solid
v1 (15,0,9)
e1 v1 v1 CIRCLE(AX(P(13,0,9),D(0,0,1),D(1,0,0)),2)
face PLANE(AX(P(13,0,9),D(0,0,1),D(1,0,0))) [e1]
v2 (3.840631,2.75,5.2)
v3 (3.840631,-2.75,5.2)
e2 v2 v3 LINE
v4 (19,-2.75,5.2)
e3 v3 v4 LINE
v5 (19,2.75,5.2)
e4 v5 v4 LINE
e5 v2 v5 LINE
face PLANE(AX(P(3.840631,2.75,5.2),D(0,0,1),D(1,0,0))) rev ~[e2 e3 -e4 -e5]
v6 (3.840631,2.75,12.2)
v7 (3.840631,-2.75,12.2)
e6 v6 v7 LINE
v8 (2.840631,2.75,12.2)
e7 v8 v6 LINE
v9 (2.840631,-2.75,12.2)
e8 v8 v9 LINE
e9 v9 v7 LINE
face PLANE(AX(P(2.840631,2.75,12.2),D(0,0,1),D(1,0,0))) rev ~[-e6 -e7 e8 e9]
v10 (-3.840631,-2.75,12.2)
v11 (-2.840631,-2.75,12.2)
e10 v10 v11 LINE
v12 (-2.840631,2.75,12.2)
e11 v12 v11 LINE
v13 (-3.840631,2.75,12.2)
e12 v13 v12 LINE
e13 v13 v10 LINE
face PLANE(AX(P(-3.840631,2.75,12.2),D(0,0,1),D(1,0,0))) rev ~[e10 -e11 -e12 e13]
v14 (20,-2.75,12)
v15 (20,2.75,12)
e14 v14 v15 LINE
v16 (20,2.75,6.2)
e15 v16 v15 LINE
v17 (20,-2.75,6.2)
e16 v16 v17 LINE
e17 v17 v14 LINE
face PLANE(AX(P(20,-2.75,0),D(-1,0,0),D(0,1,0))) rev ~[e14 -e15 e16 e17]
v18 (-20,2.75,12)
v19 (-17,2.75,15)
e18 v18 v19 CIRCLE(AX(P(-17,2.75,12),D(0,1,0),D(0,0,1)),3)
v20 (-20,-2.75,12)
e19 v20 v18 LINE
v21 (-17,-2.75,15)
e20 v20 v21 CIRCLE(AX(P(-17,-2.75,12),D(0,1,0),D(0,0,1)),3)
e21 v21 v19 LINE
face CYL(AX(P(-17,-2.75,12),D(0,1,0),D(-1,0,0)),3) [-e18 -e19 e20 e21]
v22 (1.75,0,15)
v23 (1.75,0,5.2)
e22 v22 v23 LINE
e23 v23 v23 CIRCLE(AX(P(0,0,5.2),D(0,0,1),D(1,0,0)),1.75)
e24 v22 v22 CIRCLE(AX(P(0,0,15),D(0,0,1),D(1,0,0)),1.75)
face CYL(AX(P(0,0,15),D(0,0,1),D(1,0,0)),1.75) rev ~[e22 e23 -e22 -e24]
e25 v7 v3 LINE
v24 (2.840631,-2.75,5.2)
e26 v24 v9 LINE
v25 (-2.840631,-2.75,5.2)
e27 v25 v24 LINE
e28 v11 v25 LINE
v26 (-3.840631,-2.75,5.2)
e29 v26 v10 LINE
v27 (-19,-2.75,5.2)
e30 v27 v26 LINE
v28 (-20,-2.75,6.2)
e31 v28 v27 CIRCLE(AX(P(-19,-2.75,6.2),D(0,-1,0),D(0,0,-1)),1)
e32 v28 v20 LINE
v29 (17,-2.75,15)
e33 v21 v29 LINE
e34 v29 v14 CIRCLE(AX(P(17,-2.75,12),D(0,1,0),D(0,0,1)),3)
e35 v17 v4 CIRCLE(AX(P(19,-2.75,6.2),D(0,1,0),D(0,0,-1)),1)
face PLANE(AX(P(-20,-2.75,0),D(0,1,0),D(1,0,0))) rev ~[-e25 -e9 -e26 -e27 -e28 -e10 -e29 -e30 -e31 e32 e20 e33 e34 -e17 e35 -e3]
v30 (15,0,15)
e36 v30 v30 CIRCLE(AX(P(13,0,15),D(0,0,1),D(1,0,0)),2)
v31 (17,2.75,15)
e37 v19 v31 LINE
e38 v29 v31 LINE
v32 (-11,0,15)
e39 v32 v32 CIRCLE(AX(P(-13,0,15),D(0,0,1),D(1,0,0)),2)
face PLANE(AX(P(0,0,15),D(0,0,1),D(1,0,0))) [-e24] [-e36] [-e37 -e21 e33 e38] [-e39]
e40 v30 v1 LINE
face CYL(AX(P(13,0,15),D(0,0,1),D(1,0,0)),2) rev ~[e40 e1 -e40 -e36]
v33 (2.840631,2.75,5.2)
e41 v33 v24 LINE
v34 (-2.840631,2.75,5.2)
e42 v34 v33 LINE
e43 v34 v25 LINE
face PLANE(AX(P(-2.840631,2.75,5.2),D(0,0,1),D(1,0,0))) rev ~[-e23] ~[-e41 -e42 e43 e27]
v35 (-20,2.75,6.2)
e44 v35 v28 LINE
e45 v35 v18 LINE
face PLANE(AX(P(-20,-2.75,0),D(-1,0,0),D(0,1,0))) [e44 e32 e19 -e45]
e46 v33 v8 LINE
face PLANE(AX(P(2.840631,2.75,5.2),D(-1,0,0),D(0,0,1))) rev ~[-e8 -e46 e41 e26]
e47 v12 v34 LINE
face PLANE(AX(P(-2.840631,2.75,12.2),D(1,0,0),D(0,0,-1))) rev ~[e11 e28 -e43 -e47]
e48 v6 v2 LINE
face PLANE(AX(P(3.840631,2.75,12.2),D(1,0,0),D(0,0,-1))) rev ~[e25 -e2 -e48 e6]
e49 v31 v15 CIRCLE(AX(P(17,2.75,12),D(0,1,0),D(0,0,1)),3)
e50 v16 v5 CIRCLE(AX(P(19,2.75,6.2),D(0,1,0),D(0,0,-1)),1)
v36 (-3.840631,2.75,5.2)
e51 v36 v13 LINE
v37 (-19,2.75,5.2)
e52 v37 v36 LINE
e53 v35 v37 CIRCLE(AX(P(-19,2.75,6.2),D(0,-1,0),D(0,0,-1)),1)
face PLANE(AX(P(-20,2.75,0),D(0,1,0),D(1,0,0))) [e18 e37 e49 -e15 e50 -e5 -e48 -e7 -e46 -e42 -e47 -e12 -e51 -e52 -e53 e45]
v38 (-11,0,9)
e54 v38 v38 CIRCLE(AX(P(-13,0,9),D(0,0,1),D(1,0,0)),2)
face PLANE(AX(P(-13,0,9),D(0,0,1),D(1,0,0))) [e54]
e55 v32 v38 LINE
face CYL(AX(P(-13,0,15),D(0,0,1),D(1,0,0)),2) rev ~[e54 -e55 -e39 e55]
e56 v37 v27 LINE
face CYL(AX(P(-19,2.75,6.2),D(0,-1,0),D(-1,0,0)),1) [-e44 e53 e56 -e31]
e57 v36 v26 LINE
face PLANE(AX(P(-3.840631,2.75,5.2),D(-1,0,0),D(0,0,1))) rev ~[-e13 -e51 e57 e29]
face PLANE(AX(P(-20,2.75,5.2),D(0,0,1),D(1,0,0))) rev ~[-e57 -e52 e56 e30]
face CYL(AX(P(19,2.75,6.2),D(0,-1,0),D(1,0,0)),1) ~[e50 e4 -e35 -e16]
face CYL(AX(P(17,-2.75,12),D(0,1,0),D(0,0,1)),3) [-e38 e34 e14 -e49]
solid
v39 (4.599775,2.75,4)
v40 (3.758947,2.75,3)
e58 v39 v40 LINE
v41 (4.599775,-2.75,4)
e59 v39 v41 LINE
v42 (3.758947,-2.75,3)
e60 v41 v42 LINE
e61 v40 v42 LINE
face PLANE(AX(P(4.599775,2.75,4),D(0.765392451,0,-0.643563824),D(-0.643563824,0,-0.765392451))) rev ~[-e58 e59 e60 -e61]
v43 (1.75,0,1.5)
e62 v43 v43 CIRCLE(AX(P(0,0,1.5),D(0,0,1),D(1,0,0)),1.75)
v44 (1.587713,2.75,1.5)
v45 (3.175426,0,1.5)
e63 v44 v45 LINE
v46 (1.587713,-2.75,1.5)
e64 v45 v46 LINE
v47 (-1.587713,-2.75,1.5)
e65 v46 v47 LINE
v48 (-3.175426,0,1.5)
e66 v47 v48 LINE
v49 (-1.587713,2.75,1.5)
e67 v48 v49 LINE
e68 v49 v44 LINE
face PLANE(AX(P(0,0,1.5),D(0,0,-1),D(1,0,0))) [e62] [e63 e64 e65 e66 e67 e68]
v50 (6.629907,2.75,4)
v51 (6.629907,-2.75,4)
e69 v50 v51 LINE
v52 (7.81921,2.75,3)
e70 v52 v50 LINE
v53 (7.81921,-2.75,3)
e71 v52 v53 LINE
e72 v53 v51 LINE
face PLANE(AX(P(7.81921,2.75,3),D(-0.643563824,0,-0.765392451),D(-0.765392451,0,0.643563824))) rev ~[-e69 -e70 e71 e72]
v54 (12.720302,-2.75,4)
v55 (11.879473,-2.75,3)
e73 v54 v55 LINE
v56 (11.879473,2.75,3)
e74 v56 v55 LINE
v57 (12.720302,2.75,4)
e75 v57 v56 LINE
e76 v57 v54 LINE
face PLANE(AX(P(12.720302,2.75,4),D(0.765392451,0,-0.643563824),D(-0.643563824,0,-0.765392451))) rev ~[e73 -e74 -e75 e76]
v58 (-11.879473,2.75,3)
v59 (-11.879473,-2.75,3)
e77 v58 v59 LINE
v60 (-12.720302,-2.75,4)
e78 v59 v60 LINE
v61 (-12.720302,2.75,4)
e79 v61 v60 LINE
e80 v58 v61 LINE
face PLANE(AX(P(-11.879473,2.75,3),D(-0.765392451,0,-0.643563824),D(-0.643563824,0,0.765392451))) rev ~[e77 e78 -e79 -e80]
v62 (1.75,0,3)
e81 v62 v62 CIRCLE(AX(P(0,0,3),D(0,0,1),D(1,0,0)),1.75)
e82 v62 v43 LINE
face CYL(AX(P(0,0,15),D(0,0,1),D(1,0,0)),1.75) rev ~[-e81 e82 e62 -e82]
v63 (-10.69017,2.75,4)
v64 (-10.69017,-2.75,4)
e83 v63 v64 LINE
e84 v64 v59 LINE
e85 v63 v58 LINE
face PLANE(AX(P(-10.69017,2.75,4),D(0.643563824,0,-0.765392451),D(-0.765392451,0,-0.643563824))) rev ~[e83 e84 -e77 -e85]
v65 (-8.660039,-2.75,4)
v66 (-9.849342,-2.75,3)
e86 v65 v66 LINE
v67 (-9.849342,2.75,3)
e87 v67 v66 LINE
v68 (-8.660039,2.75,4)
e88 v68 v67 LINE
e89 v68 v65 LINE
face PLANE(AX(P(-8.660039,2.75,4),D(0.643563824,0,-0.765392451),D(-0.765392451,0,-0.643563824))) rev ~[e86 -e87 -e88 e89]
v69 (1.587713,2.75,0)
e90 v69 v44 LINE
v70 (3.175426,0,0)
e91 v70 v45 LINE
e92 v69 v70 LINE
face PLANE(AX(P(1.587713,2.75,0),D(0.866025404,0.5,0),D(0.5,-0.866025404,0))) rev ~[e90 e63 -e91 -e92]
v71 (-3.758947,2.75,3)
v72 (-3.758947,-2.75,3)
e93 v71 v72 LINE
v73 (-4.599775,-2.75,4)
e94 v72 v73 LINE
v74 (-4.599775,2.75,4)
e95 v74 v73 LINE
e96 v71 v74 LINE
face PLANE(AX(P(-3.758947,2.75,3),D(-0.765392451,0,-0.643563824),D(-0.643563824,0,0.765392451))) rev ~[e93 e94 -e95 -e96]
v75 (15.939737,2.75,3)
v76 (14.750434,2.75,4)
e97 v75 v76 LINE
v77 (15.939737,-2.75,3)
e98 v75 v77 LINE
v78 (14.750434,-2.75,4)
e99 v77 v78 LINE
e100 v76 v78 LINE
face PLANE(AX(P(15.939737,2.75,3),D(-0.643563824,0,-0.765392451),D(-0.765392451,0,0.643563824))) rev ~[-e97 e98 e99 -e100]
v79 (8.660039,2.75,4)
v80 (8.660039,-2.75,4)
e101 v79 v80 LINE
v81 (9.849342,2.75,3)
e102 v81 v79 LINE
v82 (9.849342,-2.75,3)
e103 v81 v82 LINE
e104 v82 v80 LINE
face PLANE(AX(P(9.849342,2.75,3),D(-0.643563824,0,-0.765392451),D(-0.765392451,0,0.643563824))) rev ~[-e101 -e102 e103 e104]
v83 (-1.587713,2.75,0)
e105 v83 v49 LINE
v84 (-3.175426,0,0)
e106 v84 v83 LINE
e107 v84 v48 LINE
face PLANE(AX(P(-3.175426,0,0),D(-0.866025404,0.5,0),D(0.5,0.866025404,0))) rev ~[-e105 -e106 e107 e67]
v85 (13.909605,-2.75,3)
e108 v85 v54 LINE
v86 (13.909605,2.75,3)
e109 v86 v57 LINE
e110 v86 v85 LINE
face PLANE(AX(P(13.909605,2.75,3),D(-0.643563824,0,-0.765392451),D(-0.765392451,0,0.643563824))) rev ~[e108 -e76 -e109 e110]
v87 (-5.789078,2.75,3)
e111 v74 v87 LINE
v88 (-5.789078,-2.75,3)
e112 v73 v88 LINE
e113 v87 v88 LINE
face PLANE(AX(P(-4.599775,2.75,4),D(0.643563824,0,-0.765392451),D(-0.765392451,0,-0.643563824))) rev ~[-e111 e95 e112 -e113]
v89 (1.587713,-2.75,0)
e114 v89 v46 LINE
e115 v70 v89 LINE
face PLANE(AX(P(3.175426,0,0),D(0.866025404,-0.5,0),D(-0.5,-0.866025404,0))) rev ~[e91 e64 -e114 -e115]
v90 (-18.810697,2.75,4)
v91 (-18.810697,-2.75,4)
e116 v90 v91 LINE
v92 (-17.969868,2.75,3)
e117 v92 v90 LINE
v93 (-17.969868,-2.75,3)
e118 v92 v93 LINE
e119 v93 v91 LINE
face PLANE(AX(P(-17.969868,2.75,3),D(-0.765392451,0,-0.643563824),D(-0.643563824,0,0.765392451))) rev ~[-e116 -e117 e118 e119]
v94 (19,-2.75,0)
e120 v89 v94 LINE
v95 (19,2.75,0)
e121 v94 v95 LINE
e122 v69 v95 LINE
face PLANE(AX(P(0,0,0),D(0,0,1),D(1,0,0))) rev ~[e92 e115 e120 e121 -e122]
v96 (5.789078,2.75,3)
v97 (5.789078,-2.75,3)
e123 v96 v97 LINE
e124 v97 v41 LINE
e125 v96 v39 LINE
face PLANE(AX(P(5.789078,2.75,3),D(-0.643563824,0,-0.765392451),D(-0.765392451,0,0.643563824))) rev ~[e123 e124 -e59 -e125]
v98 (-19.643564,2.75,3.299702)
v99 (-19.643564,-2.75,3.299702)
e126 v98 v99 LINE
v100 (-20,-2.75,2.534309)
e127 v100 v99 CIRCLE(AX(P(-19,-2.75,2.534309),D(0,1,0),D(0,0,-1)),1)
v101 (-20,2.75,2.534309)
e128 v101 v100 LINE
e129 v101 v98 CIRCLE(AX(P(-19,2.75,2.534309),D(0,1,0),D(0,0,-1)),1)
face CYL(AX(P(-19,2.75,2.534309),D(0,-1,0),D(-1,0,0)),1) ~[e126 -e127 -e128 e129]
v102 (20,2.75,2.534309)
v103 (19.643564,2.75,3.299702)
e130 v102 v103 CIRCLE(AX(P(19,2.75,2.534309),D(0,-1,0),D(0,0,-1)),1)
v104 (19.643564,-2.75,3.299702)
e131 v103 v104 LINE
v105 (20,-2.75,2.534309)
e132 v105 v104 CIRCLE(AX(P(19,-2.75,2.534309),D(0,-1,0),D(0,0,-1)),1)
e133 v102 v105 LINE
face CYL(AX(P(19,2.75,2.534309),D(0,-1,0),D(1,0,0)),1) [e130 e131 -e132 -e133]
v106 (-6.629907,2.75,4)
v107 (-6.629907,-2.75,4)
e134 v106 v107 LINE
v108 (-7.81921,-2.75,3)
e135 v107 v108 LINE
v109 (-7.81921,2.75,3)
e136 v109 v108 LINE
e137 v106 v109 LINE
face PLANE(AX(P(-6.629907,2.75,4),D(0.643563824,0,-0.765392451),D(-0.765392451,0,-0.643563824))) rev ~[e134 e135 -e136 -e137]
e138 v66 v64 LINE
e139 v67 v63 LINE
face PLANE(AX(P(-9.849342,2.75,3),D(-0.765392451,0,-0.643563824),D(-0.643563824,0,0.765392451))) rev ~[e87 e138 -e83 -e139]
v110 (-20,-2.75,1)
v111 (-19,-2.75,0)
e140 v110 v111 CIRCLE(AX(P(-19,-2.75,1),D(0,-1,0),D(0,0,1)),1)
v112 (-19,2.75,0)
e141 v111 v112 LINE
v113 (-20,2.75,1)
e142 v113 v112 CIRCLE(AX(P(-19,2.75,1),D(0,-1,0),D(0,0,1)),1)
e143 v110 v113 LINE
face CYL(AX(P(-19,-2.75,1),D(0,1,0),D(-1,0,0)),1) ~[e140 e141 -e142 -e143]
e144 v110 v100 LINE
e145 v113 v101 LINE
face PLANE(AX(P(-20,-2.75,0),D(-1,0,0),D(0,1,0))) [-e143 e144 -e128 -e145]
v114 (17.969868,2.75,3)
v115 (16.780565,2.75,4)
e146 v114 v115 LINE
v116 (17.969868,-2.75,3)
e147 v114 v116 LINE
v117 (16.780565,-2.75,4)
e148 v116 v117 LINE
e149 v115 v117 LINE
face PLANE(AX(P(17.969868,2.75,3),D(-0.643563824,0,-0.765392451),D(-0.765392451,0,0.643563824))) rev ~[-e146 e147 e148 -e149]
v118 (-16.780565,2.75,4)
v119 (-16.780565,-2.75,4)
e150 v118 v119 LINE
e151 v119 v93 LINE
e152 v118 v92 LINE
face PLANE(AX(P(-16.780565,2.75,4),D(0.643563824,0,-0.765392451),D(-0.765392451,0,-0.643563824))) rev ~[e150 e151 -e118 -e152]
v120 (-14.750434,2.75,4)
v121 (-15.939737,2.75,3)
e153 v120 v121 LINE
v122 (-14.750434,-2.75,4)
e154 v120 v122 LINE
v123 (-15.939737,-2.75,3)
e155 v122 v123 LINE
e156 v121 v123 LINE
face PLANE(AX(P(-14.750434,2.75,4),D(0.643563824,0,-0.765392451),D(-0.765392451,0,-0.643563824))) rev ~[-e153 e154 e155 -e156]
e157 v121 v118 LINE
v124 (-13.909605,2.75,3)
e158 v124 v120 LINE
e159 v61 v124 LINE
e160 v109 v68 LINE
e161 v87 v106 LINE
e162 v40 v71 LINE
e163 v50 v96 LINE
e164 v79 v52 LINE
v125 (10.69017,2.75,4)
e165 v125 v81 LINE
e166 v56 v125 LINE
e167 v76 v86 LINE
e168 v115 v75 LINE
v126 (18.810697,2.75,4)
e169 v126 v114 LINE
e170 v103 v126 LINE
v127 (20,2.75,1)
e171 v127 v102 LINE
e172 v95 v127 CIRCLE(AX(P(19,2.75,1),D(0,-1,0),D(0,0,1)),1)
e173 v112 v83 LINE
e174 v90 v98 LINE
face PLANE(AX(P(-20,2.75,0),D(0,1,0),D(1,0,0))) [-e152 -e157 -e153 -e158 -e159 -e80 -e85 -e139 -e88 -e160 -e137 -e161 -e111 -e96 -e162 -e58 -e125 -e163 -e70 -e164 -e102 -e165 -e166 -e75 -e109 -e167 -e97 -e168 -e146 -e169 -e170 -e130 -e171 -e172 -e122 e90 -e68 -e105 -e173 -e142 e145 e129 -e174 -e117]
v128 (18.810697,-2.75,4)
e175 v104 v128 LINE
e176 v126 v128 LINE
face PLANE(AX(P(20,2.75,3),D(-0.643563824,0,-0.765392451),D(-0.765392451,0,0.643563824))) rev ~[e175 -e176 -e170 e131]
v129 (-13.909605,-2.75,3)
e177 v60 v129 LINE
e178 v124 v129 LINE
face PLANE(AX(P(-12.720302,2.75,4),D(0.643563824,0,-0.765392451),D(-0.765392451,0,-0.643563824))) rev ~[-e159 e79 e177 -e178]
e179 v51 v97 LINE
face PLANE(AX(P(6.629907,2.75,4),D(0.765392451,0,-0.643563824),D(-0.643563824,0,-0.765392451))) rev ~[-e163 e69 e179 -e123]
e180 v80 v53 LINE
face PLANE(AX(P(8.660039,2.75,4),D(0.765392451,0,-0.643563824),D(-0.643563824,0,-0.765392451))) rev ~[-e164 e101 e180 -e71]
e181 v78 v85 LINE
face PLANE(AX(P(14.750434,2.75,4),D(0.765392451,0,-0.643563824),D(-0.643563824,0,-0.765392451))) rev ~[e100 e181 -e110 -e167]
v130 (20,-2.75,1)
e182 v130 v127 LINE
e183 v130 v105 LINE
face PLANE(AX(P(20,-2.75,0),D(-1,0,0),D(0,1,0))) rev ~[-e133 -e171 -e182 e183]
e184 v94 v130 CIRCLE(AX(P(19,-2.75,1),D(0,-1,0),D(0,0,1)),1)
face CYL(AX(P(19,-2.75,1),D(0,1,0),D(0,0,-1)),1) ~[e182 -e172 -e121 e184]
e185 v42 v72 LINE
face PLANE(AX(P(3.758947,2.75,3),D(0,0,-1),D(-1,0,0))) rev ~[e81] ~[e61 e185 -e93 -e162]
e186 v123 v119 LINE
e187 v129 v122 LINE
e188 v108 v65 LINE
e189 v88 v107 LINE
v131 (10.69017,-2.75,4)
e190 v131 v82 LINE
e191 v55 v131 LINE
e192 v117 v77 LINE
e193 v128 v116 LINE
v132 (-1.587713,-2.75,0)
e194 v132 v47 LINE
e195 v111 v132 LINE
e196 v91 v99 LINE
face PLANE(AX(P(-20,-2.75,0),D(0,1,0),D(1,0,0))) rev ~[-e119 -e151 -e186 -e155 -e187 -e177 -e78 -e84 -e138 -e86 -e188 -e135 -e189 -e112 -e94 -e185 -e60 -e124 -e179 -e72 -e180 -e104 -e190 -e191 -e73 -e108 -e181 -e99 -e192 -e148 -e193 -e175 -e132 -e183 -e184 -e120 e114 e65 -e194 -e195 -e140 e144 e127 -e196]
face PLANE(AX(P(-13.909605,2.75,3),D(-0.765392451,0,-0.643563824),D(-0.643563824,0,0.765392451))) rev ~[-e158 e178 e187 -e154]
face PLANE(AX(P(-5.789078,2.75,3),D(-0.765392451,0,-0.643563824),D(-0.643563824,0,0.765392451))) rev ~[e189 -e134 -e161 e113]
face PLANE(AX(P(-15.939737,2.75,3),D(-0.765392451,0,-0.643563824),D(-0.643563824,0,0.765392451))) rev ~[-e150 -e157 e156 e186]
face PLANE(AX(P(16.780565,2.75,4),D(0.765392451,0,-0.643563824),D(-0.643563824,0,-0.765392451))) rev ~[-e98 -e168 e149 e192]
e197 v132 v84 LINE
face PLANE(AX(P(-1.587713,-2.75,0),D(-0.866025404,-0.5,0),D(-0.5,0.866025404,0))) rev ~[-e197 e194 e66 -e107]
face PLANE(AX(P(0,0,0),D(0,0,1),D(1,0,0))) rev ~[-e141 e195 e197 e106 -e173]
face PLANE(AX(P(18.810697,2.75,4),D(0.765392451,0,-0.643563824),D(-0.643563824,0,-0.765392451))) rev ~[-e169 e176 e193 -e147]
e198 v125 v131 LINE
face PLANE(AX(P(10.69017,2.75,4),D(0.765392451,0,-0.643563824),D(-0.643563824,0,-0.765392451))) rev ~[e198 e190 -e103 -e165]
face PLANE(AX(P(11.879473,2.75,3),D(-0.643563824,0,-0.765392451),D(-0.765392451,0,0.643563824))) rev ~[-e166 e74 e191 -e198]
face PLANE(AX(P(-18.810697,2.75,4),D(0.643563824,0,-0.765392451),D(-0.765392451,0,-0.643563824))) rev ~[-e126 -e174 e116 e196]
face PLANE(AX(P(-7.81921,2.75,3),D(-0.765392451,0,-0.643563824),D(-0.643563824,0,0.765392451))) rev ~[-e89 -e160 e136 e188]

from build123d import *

# Parameters (mm, degrees)
F0_W      = 40
F0_H      = 5.5
F1_DEPTH  = 15
F3_DEPTH  = 6
F4_R      = 3
F5_R      = 2
F6_DEPTH  = 6
F7_R      = 1
F9_DEPTH  = 1.5
F10_R     = 1.75
F11_DEPTH = 25


# Not quite as in the source:
# - a feature names something its author has since deleted; it is built from what else it names


with BuildPart() as f1:
    # F0 (on Top) → F1 (new body)
    with BuildSketch(Plane.XY):
        Rectangle(F0_W, F0_H)
    extrude(amount=F1_DEPTH)

    # F2 (on face) → F3 (cut)
    with BuildSketch(Plane(origin=(0, 2.75, 0), x_dir=(-1, 0, 0), z_dir=(0, 1, 0))):
        Polygon((0, 3), (3.758946807, 3), (4.599775356, 4), (5.7890784562, 3), (6.6299070052, 4), (7.8192101053, 3), (8.6600386543, 4), (9.8493417544, 3), (10.6901703034, 4), (11.8794734035, 3), (12.7203019525, 4), (13.9096050526, 3), (14.7504336016, 4), (15.9397367018, 3), (16.7805652508, 4), (17.9698683509, 3), (18.8106968999, 4), (20, 3), (20, 5.2), (3.8406314086, 5.2), (3.8406314086, 12.2), (2.8406314086, 12.2), (2.8406314086, 5.2), (0, 5.2), (-2.8406314086, 5.2), (-2.8406314086, 12.2), (-3.8406314086, 12.2), (-3.8406314086, 5.2), (-20, 5.2), (-20, 3), (-18.8106968999, 4), (-17.9698683509, 3), (-16.7805652508, 4), (-15.9397367018, 3), (-14.7504336016, 4), (-13.9096050526, 3), (-12.7203019525, 4), (-11.8794734035, 3), (-10.6901703034, 4), (-9.8493417544, 3), (-8.6600386543, 4), (-7.8192101053, 3), (-6.6299070052, 4), (-5.7890784562, 3), (-4.599775356, 4), (-3.758946807, 3), align=None)
    extrude(amount=-F3_DEPTH, mode=Mode.SUBTRACT)

    # F4
    f4_edges = [f1.edges().sort_by_distance(p)[0] for p in [
        (-20, 0, 15),
        (20, 0, 15),
    ]]
    fillet(f4_edges, radius=F4_R)

    # F5 (on face) → F6 (cut)
    with BuildSketch(Plane.XY.offset(15)):
        with Locations((-13, 0)):
            Circle(F5_R)
        with Locations((13, 0)):
            Circle(F5_R)
    extrude(amount=-F6_DEPTH, mode=Mode.SUBTRACT)

    # F7
    f7_edges = [f1.edges().sort_by_distance(p)[0] for p in [
        (-20, 0, 5.2),
        (-20, 0, 0),
        (20, 0, 0),
        (20, 0, 5.2),
        (-20, 0, 3),
        (20, 0, 3),
    ]]
    fillet(f7_edges, radius=F7_R)

    # F8 (on face) → F9 (cut)
    with BuildSketch(Plane(origin=(0, 0, 0), x_dir=(1, 0, 0), z_dir=(0, 0, -1))):
        Polygon((-1.5877132403, -2.75), (1.5877132403, -2.75), (3.1754264805, 0), (1.5877132403, 2.75), (-1.5877132403, 2.75), (-3.1754264805, 0), align=None)
    extrude(amount=-F9_DEPTH, mode=Mode.SUBTRACT)

    # F10 (on face) → F11 (cut)
    with BuildSketch(Plane.XY.offset(15)):
        Circle(F10_R)
    extrude(amount=-F11_DEPTH, mode=Mode.SUBTRACT)


solid = f1.part
